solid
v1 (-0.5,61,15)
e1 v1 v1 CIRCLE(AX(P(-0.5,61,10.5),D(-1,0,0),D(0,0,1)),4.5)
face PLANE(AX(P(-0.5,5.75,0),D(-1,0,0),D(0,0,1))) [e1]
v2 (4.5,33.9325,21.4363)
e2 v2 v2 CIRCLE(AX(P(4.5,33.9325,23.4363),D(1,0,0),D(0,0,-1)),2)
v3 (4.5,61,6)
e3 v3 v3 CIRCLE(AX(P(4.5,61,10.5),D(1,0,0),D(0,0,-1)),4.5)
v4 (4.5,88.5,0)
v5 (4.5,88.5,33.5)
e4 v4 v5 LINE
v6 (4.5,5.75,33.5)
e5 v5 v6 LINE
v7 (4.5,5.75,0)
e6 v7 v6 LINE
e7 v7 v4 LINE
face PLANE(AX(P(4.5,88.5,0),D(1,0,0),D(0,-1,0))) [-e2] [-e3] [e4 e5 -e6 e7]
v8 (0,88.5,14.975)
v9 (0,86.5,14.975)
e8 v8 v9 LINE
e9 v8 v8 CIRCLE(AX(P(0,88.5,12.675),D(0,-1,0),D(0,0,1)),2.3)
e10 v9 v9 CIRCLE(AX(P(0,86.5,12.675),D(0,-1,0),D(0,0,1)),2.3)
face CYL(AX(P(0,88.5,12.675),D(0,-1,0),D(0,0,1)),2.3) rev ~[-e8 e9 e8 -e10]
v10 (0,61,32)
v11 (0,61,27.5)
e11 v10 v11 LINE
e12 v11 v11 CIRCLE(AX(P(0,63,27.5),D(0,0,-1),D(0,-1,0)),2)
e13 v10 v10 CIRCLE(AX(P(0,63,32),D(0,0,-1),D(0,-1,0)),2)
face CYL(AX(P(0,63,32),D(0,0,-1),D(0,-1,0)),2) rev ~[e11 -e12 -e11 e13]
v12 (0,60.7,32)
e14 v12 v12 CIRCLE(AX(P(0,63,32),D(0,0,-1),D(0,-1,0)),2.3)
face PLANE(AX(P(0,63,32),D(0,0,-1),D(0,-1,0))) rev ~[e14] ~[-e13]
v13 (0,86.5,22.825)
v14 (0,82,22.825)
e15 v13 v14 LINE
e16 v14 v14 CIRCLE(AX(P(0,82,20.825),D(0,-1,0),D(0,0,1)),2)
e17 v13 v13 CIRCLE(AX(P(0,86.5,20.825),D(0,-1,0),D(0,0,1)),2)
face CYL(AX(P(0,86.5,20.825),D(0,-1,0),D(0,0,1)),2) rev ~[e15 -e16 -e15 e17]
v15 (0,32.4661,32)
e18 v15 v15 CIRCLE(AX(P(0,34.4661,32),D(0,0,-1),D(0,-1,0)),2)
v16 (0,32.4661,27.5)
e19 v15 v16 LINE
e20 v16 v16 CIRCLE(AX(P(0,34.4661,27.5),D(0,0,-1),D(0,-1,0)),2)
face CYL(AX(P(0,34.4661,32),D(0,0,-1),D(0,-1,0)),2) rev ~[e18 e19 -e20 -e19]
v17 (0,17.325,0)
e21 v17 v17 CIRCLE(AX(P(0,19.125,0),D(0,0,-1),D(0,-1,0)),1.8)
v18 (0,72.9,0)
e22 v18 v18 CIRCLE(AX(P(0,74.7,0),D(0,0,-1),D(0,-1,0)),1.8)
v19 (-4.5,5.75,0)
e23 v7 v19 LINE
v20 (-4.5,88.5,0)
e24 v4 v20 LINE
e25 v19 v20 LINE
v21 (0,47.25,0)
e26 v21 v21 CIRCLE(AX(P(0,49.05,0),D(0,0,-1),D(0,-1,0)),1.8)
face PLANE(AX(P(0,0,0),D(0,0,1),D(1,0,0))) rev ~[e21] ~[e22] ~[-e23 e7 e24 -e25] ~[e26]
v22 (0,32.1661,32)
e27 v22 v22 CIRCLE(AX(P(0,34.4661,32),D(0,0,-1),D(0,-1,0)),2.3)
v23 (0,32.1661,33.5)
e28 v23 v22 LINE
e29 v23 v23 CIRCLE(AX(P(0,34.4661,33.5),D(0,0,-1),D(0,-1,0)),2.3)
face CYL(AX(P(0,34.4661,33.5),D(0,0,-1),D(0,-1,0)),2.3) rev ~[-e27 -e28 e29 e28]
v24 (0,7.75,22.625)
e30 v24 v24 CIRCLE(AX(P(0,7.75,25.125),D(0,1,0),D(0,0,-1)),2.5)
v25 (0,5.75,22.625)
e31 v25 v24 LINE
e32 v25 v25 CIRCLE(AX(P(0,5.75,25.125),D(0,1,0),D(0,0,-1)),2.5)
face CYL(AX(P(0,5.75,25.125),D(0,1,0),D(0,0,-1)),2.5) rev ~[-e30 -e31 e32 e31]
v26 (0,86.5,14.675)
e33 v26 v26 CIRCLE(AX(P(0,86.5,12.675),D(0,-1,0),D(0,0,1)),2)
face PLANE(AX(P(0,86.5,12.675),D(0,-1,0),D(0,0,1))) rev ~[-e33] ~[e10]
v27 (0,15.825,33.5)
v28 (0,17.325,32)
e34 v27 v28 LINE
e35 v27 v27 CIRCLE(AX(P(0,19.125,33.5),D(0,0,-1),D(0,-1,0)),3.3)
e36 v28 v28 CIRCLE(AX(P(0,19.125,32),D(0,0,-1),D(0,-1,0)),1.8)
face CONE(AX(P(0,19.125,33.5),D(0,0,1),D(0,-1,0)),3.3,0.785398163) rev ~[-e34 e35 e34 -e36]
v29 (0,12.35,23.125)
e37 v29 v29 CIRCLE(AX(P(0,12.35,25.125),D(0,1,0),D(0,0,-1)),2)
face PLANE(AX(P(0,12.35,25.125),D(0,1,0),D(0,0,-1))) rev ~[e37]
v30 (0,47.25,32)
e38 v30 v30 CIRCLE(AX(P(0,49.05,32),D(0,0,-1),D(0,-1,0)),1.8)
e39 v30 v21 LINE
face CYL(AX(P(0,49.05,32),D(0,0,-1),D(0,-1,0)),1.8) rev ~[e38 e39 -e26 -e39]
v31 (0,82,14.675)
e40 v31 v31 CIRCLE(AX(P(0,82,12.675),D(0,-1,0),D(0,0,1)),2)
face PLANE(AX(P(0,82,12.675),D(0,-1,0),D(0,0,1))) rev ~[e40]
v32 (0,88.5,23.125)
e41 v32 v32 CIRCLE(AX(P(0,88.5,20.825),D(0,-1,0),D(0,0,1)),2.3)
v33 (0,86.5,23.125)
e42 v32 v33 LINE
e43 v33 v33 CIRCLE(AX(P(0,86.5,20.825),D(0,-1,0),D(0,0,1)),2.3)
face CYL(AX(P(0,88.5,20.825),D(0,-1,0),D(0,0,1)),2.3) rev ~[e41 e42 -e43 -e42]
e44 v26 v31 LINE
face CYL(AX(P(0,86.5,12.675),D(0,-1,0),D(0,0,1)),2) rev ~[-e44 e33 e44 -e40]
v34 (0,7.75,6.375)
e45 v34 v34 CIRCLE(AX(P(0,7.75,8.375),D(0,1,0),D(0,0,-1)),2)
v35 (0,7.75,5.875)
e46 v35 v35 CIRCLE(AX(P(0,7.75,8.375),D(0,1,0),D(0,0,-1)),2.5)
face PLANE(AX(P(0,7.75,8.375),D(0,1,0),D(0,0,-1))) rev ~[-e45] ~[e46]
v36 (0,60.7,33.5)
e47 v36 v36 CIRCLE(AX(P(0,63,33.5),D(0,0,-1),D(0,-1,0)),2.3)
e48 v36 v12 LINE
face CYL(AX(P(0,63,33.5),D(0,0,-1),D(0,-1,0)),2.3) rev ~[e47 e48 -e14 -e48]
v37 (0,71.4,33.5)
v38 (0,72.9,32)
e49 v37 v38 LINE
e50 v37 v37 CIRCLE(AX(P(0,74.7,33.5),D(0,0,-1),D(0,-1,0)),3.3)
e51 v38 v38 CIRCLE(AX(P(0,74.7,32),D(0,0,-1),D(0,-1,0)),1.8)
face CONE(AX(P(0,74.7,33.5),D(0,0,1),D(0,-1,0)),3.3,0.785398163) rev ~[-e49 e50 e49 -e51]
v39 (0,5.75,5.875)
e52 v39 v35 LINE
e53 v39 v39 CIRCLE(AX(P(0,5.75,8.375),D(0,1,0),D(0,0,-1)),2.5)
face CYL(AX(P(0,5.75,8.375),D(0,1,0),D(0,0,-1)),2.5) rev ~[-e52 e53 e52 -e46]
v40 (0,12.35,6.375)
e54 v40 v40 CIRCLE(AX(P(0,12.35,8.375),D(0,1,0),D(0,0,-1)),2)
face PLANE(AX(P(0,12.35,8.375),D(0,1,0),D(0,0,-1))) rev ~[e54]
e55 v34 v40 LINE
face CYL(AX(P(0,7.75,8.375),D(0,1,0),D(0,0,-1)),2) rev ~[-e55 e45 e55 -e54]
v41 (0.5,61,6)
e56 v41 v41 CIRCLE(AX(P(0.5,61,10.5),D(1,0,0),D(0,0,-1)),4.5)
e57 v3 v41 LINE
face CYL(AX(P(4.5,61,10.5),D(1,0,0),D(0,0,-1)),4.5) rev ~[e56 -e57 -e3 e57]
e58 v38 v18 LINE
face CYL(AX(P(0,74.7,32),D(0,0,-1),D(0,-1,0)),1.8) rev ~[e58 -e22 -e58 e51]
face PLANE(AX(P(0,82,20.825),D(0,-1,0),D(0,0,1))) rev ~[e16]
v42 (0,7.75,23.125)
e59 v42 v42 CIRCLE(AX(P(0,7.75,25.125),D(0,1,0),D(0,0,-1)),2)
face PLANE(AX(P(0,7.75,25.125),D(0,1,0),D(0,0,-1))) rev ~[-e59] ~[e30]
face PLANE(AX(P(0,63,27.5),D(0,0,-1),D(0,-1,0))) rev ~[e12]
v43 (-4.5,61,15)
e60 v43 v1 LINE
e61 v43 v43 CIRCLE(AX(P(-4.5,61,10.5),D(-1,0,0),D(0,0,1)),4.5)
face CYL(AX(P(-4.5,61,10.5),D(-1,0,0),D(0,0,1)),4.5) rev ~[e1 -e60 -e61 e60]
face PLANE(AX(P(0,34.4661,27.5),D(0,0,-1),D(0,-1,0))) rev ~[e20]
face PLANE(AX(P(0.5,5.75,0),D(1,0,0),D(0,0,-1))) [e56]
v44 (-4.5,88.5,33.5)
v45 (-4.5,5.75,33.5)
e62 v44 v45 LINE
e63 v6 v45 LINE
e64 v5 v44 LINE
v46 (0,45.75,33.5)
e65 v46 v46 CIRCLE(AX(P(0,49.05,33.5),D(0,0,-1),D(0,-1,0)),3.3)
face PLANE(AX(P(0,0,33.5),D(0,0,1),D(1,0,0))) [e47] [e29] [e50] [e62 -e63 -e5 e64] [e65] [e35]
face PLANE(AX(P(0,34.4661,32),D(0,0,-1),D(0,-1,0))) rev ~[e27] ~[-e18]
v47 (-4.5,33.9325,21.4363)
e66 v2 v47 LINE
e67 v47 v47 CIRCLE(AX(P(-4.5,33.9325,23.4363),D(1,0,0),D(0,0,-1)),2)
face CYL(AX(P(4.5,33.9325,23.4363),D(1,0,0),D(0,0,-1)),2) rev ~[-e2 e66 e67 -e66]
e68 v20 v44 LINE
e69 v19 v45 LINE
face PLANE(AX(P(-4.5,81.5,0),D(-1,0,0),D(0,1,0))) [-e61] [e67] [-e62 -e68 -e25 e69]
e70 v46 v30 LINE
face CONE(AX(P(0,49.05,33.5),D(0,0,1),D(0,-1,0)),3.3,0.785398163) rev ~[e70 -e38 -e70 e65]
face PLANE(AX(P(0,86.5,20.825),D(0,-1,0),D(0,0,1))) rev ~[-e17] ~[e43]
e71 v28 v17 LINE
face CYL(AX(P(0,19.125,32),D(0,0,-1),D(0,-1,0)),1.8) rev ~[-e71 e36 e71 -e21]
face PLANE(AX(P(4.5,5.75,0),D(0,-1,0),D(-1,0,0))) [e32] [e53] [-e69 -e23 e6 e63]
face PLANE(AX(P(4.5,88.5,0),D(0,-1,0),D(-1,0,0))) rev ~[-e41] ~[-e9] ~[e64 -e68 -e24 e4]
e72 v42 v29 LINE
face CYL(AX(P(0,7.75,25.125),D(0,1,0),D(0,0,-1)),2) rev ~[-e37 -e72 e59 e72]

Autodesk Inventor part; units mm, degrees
ref_plane "YZ Plane" through (0, 0, 0) normal (1, 0, 0) x (0, 1, 0)
ref_plane "XZ Plane" through (0, 0, 0) normal (0, 1, 0) x (-1, 0, 0)
ref_plane "Work Plane1" through (0, 0, 0) normal (0, 0, 1) x (1, 0, 0)
ref_plane "Work Plane2" through (-89, -40.3889, 33.5) normal (0, 0, 1) x (1, 0, 0)
sketch "Sketch1" plane through (0, 0, 0) normal (0, 0, 1) x (1, 0, 0)
  line L0 (23.5, 88.5) -> (-23.5, 88.5) projected
  line L1 (-23.5, 88.5) -> (-23.5, 36.5) projected
  line L2 (-26.5, 33.5) -> (-89, 33.5) projected
  line L3 (-89, 33.5) -> (-89, -72.5) projected
  line L4 (-89, -72.5) -> (-77, -72.5) projected
  line L5 (-74, -75.5) -> (-74, -93.5) projected
  line L6 (-74, -93.5) -> (74, -93.5) projected
  line L7 (74, -93.5) -> (74, -75.5) projected
  line L8 (77, -72.5) -> (89, -72.5) projected
  line L9 (89, -72.5) -> (89, 33.5) projected
  line L10 (89, 33.5) -> (26.5, 33.5) projected
  line L11 (23.5, 36.5) -> (23.5, 88.5) projected
  line L12 (-4.5, 81.5) -> (-4.5, 36.5) projected
  line L13 (-7.5, 33.5) -> (-13.5, 33.5) projected
  line L14 (-16.5, 36.5) -> (-16.5, 81.5) projected
  line L15 (7.5, 84.5) -> (13.5, 84.5) projected
  line L16 (16.5, 81.5) -> (16.5, 36.5) projected
  line L17 (13.5, 33.5) -> (7.5, 33.5) projected
  line L18 (4.5, 36.5) -> (4.5, 81.5) projected
  line L19 (-13.5, 84.5) -> (-7.5, 84.5) projected
  line L20 (-4.5, 88.5) -> (4.5, 88.5)
  line L21 (4.5, 88.5) -> (4.5, 5.75)
  line L22 (4.5, 5.75) -> (-4.5, 5.75)
  line L23 (-4.5, 5.75) -> (-4.5, 88.5)
  line L24 (-32.2, 4.75) -> (-59.9, 4.75)
  arc A0 (13.5, 33.5) -> (16.5, 36.5) centre (13.5, 36.5) ccw projected
  arc A1 (4.5, 36.5) -> (7.5, 33.5) centre (7.5, 36.5) ccw projected
  arc A2 (7.5, 84.5) -> (4.5, 81.5) centre (7.5, 81.5) ccw projected
  arc A3 (16.5, 81.5) -> (13.5, 84.5) centre (13.5, 81.5) ccw projected
  arc A4 (-4.5, 81.5) -> (-7.5, 84.5) centre (-7.5, 81.5) ccw projected
  arc A5 (-7.5, 33.5) -> (-4.5, 36.5) centre (-7.5, 36.5) ccw projected
  arc A6 (-16.5, 36.5) -> (-13.5, 33.5) centre (-13.5, 36.5) ccw projected
  arc A7 (-13.5, 84.5) -> (-16.5, 81.5) centre (-13.5, 81.5) ccw projected
  arc A8 (-26.5, 33.5) -> (-23.5, 36.5) centre (-26.5, 36.5) ccw projected
  arc A9 (-74, -75.5) -> (-77, -72.5) centre (-77, -75.5) ccw projected
  arc A10 (77, -72.5) -> (74, -75.5) centre (77, -75.5) ccw projected
  arc A11 (23.5, 36.5) -> (26.5, 33.5) centre (26.5, 36.5) ccw projected
  circle A12 centre (21.5, -85.5) radius 1.8 projected
  circle A13 centre (-64.5, -85.5) radius 1.8 projected
  circle A14 centre (83.4, -16.3889) radius 1.8 projected
  circle A15 centre (-83.4, -19.2889) radius 1.8 projected
  circle A16 centre (-21.5, -85.5) radius 1.8 projected
  circle A17 centre (64.5, -85.5) radius 1.8 projected
  circle A18 centre (39.125, 4.3375) radius 1.0065 projected
  circle A19 centre (-72.95, 4.275) radius 1.0065 projected
  circle A20 centre (39.125, 25.9125) radius 1.0065 projected
  circle A21 centre (72.95, 12.275) radius 1.0065 projected
  circle A22 centre (86, 30.5) radius 1.0065 projected
  circle A23 centre (-86, 30.5) radius 1.0065 projected
  circle A24 centre (-39.125, 12.3375) radius 1.0065 projected
  circle A25 centre (-72.95, 25.975) radius 1.0065 projected
  circle A26 centre (-72.95, 12.275) radius 1.0065 projected
  circle A27 centre (-39.125, 25.9125) radius 1.0065 projected
  circle A28 centre (-86, 7.75) radius 1.0065 projected
  circle A29 centre (86, 7.75) radius 1.0065 projected
  circle A30 centre (72.95, 25.975) radius 1.0065 projected
  circle A31 centre (39.125, 12.3375) radius 1.0065 projected
  circle A32 centre (-39.125, 4.3375) radius 1.0065 projected
  circle A33 centre (72.95, 4.275) radius 1.0065 projected
  circle A34 centre (78, -67.1725) radius 1.2295 projected
  circle A35 centre (-24.1, -73.1) radius 1.2295 projected
  circle A36 centre (24.1, -24.9) radius 1.2295 projected
  circle A37 centre (-42.4984, -44.6666) radius 1.2295 projected
  circle A38 centre (-79, -42.3889) radius 1.2295 projected
  circle A39 centre (-19.5, 28.875) radius 1.2295 projected
  circle A40 centre (19.5, 9.55) radius 1.2295 projected
  circle A41 centre (19.5, 47.3) radius 1.2295 projected
  circle A42 centre (-19.5, 47.3) radius 1.2295 projected
  circle A43 centre (0, 74.7) radius 1.2295 projected
  circle A44 centre (-19.4231, 74.8077) radius 1.2295 projected
  circle A45 centre (19.5, 74.7) radius 1.2295 projected
  circle A46 centre (0, 49.05) radius 1.2295 projected
  circle A47 centre (19.5, 28.875) radius 1.2295 projected
  circle A48 centre (0, 19.125) radius 1.2295 projected
  circle A49 centre (-19.5, 9.55) radius 1.2295 projected
  circle A50 centre (-78, -67.1725) radius 1.2295 projected
  circle A51 centre (-24.1, -24.9) radius 1.2295 projected
  circle A52 centre (24.1, -73.1) radius 1.2295 projected
  circle A53 centre (42.5, -44.6649) radius 1.2295 projected
  circle A54 centre (79, -42.3889) radius 1.2295 projected
  line L25 (74, -12.9454) -> (74, -38.6649) projected
  line L26 (32.5736, -41.3399) -> (10.2484, -66.6122) projected
  line L27 (40.7223, -24.1882) -> (40.7223, -2.7315) projected
  line L28 (15.0791, 0.2685) -> (31.7223, 0.2685) projected
  line L29 (-68.7516, -10.9592) -> (-46.0313, -36.6788) projected
  line L30 (-74, -38.6649) -> (-74, -12.9454) projected
  line L31 (43.7223, 0.2685) -> (62.6769, 0.2685) projected
  line L32 (-40.7223, -2.7315) -> (-40.7223, -24.1882) projected
  line L33 (-45.9707, -26.1743) -> (-64.9252, -4.7177) projected
  line L34 (46.0313, -36.6788) -> (68.7516, -10.9592) projected
  line L35 (-62.6769, 0.2685) -> (-43.7223, 0.2685) projected
  line L36 (34.7223, -2.7315) -> (34.7223, -24.9078) projected
  line L37 (29.5555, -26.9826) -> (10.5667, -7.1519) projected
  line L38 (-31.598, -53.0174) -> (-25.9833, -59.3733) projected
  line L39 (-10.5667, -7.1519) -> (-29.5555, -26.9826) projected
  line L40 (-34.7223, -24.9078) -> (-34.7223, -2.7315) projected
  line L41 (-31.7223, 0.2685) -> (-15.0791, 0.2685) projected
  line L42 (25.9833, -59.3733) -> (31.598, -53.0174) projected
  line L43 (64.9252, -4.7177) -> (45.9707, -26.1743) projected
  line L44 (-10.2484, -66.6122) -> (-32.5736, -41.3399) projected
  line L45 (-32.4921, -37.2789) -> (-10.1668, -13.9638) projected
  line L46 (10.1668, -13.9638) -> (32.4921, -37.2789) projected
  line L47 (29.5955, -81.1563) -> (25.3044, -62.0157) projected
  arc A55 (25.9833, -59.3733) -> (25.3044, -62.0157) centre (28.2317, -61.3594) ccw projected
  line L48 (43.9754, -47.6649) -> (68.9203, -47.6649) projected
  arc A56 (71.5475, -52.1134) -> (68.9203, -47.6649) centre (68.9203, -50.6649) ccw projected
  line L49 (71.5475, -52.1134) -> (58.4661, -75.8408) projected
  line L50 (46.5943, -83.5) -> (32.5229, -83.5) projected
  arc A57 (29.5955, -81.1563) -> (32.5229, -83.5) centre (32.5229, -80.5) ccw projected
  line L51 (-5, -16.0387) -> (-5, -64.6261) projected
  arc A58 (-10.2484, -66.6122) -> (-5, -64.6261) centre (-8, -64.6261) ccw projected
  arc A59 (-32.4921, -37.2789) -> (-32.5736, -41.3399) centre (-30.3253, -39.3537) ccw projected
  arc A60 (-5, -16.0387) -> (-10.1668, -13.9638) centre (-8, -16.0387) ccw projected
  arc A61 (-40.7223, -2.7315) -> (-43.7223, 0.2685) centre (-43.7223, -2.7315) ccw projected
  arc A62 (-45.9707, -26.1743) -> (-40.7223, -24.1882) centre (-43.7223, -24.1882) ccw projected
  arc A63 (-62.6769, 0.2685) -> (-64.9252, -4.7177) centre (-62.6769, -2.7315) ccw projected
  arc A64 (-25.3044, -62.0157) -> (-25.9833, -59.3733) centre (-28.2317, -61.3594) ccw projected
  line L52 (-25.3044, -62.0157) -> (-29.5955, -81.1563) projected
  arc A65 (-32.5229, -83.5) -> (-29.5955, -81.1563) centre (-32.5229, -80.5) ccw projected
  line L53 (-32.5229, -83.5) -> (-46.5943, -83.5) projected
  line L54 (-58.4661, -75.8408) -> (-71.5475, -52.1134) projected
  arc A66 (-68.9203, -47.6649) -> (-71.5475, -52.1134) centre (-68.9203, -50.6649) ccw projected
  line L55 (-68.9203, -47.6649) -> (-43.9754, -47.6649) projected
  line L56 (-49.775, 11.125) -> (-62.3, 11.125) projected
  arc A67 (-62.3, 27.125) -> (-62.3, 11.125) centre (-62.3, 19.125) ccw projected
  line L57 (-62.3, 27.125) -> (-49.775, 27.125) projected
  arc A68 (-49.775, 11.125) -> (-49.775, 27.125) centre (-49.775, 19.125) ccw projected
  arc A69 (-31.7223, 0.2685) -> (-34.7223, -2.7315) centre (-31.7223, -2.7315) ccw projected
  arc A70 (-12.9578, -0.6102) -> (-15.0791, 0.2685) centre (-15.0791, -2.7315) ccw projected
  line L58 (-12.9578, -0.6102) -> (-10.6122, -2.9558) projected
  arc A71 (-10.5667, -7.1519) -> (-10.6122, -2.9558) centre (-12.7335, -5.0771) ccw projected
  arc A72 (-34.7223, -24.9078) -> (-29.5555, -26.9826) centre (-31.7223, -24.9078) ccw projected
  arc A73 (71, -41.6649) -> (74, -38.6649) centre (71, -38.6649) ccw projected
  line L59 (71, -41.6649) -> (48.2797, -41.6649) projected
  arc A74 (46.0313, -36.6788) -> (48.2797, -41.6649) centre (48.2797, -38.6649) ccw projected
  arc A75 (74, -12.9454) -> (68.7516, -10.9592) centre (71, -12.9454) ccw projected
  arc A76 (40.7223, -24.1882) -> (45.9707, -26.1743) centre (43.7223, -24.1882) ccw projected
  arc A77 (43.7223, 0.2685) -> (40.7223, -2.7315) centre (43.7223, -2.7315) ccw projected
  arc A78 (64.9252, -4.7177) -> (62.6769, 0.2685) centre (62.6769, -2.7315) ccw projected
  arc A79 (5, -64.6261) -> (10.2484, -66.6122) centre (8, -64.6261) ccw projected
  line L60 (5, -64.6261) -> (5, -16.0387) projected
  arc A80 (10.1668, -13.9638) -> (5, -16.0387) centre (8, -16.0387) ccw projected
  arc A81 (32.5736, -41.3399) -> (32.4921, -37.2789) centre (30.3253, -39.3537) ccw projected
  arc A82 (29.5555, -26.9826) -> (34.7223, -24.9078) centre (31.7223, -24.9078) ccw projected
  arc A83 (10.6122, -2.9558) -> (10.5667, -7.1519) centre (12.7335, -5.0771) ccw projected
  line L61 (10.6122, -2.9558) -> (12.9578, -0.6102) projected
  arc A84 (15.0791, 0.2685) -> (12.9578, -0.6102) centre (15.0791, -2.7315) ccw projected
  arc A85 (34.7223, -2.7315) -> (31.7223, 0.2685) centre (31.7223, -2.7315) ccw projected
  arc A86 (-48.2797, -41.6649) -> (-46.0313, -36.6788) centre (-48.2797, -38.6649) ccw projected
  line L62 (-48.2797, -41.6649) -> (-71, -41.6649) projected
  arc A87 (-74, -38.6649) -> (-71, -41.6649) centre (-71, -38.6649) ccw projected
  arc A88 (-68.7516, -10.9592) -> (-74, -12.9454) centre (-71, -12.9454) ccw projected
  line L63 (49.775, 27.125) -> (62.3, 27.125) projected
  arc A89 (62.3, 11.125) -> (62.3, 27.125) centre (62.3, 19.125) ccw projected
  line L64 (62.3, 11.125) -> (49.775, 11.125) projected
  arc A90 (49.775, 27.125) -> (49.775, 11.125) centre (49.775, 19.125) ccw projected
  arc A91 (53.1556, -75.734) -> (58.4661, -75.8408) centre (55.8389, -74.3924) ccw projected
  line L65 (53.1556, -75.734) -> (41.2921, -52.0066) projected
  arc A92 (43.9754, -47.6649) -> (41.2921, -52.0066) centre (43.9754, -50.6649) ccw projected
  arc A93 (36.5297, -53.662) -> (31.598, -53.0174) centre (33.8464, -55.0036) ccw projected
  line L66 (36.5297, -53.662) -> (49.2776, -79.1584) projected
  arc A94 (46.5943, -83.5) -> (49.2776, -79.1584) centre (46.5943, -80.5) ccw projected
  arc A95 (-49.2776, -79.1584) -> (-46.5943, -83.5) centre (-46.5943, -80.5) ccw projected
  line L67 (-49.2776, -79.1584) -> (-36.5297, -53.662) projected
  arc A96 (-31.598, -53.0174) -> (-36.5297, -53.662) centre (-33.8464, -55.0036) ccw projected
  arc A97 (-41.2921, -52.0066) -> (-43.9754, -47.6649) centre (-43.9754, -50.6649) ccw projected
  line L68 (-41.2921, -52.0066) -> (-53.1556, -75.734) projected
  arc A98 (-58.4661, -75.8408) -> (-53.1556, -75.734) centre (-55.8389, -74.3924) ccw projected
  point P0 (0, 0)
  point P1 (-4.5, 81.5)
  point P2 (-4.5, 36.5)
  point P3 (7.5, 81.5)
  point P4 (13.5, 81.5)
  point P5 (-7.5, 81.5)
  point P6 (-13.5, 81.5)
  point P7 (-29, -78.5)
  point P8 (-57, -78.5)
  point P9 (29, -78.5)
  point P10 (57, -78.5)
  dimension "d41" = 1
extrude "Extrusion1" add sketch "Sketch1" along normal up to surface (33.5 mm away) contours L21 L18 L22 L23 L12 L0 | A43 | A46 | A48
sketch "Sketch2" plane through (4.5, 5.75, 0) normal (1, 0, 0) x (0, 0, -1)
  circle A0 centre (-23.4363, 28.1825) radius 2 projected
  point P0 (0, -5.75)
extrude "Extrusion2" cut sketch "Sketch2" against normal blind 10
sketch "Sketch3" plane through (4.5, 5.75, 0) normal (1, 0, 0) x (0, 0, -1)
  circle A0 centre (-10.5, 55.25) radius 4.5 projected
  point P0 (0, -5.75)
extrude "Extrusion3" cut sketch "Sketch3" against normal blind 4
sketch "Sketch4" plane through (-4.5, 5.75, 0) normal (-1, 0, 0) x (0, 0, 1)
  circle A0 centre (10.5, 55.25) radius 4.5 projected
  point P0 (0, -5.75)
extrude "Extrusion4" cut sketch "Sketch4" against normal blind 4
sketch "Sketch5" plane through (-4.5, 5.75, 33.5) normal (0, 0, 1) x (1, 0, 0)
  line L0 (5, 59.75) -> (5, 50.75) projected
  line L1 (4, 50.75) -> (4, 59.75) projected
  line L2 (9, 26.1825) -> (0, 26.1825) projected
  line L3 (9, 30.1825) -> (0, 30.1825) projected
  line L4 (17, 78.15) -> (-8, 78.15)
  line L5 (-8, 35.85) -> (17, 35.85)
  line L6 (9, 82.75) -> (9, 0) projected
  line L7 (0, 50.75) -> (0, 59.75) projected
  line L8 (9, 35.85) -> (0, 35.85)
  line L9 (0, 35.85) -> (0, 50.75)
  line L10 (0, 50.75) -> (9, 50.75)
  line L11 (9, 50.75) -> (9, 35.85)
  line L12 (0, 0) -> (0, 82.75) projected
  line L13 (9, 78.15) -> (0, 78.15)
  line L14 (0, 78.15) -> (0, 59.75)
  line L15 (0, 59.75) -> (9, 59.75)
  line L16 (9, 59.75) -> (9, 78.15)
  line L17 (-18, 6.625) -> (-18, 20.125) projected
  line L18 (-18, 13.375) -> (27, 13.375)
  line L19 (9, 35.85) -> (0, 50.75)
  line L20 (9, 59.75) -> (9, 50.75) projected
  line L21 (0, 35.85) -> (9, 50.75)
  line L22 (9, 59.75) -> (0, 78.15)
  line L23 (0, 59.75) -> (9, 78.15)
  point P0 (4.5, -5.75)
  point P1 (4.5, 13.375)
  point P2 (4.5, 43.3)
  point P3 (4.5, 68.95)
  dimension "d9" = 4.5
  dimension "d10" = 4.5
hole "Hole1" at (0, 19.125, 33.5) at (0, 49.05, 33.5) at (0, 74.7, 33.5) direction (0, 0, -1) diameter 3.6 end through all countersink diameter 6.6 countersink angle 90 clearance for "Countersunk Flat Head Screw ISO 2009/7046" size "M3" standard "ISO"
sketch "Sketch6" plane through (-4.5, 5.75, 0) normal (0, -1, 0) x (1, 0, 0)
  line L0 (9, 33.5) -> (0, 33.5) projected
  line L1 (0, 0) -> (0, 33.5) projected
  line L2 (0, 0) -> (9, 0) projected
  line L3 (9, 0) -> (9, 33.5) projected
  line L4 (0, 16.75) -> (9, 16.75)
  line L5 (9, 16.75) -> (0, 33.5)
  line L6 (9, 33.5) -> (0, 16.75)
  line L7 (0, 16.75) -> (9, 0)
  line L8 (9, 16.75) -> (0, 0)
  point P0 (4.5, 0)
  point P1 (4.5, 8.375)
  point P2 (4.5, 25.125)
hole "Hole2" at (0, 5.75, 8.375) at (0, 5.75, 25.125) direction (0, 1, 0) diameter 4 depth 6.6 counterbore diameter 5 counterbore depth 2
sketch "Sketch7" plane through (-4.5, 88.5, 0) normal (0, 1, 0) x (1, 0, 0)
  line L0 (0, -33.5) -> (9, -33.5) projected
  line L1 (0, -33.5) -> (9, -33.5) projected
  line L2 (9, 0) -> (9, -33.5) projected
  line L3 (9, 0) -> (0, 0) projected
  line L4 (0, 0) -> (0, -33.5) projected
  line L5 (-8, -1.4) -> (-8, -6.6) projected
  line L6 (-8, -32.1) -> (-8, -26.9) projected
  line L7 (17, -32.1) -> (17, -26.9) projected
  line L8 (17, -1.4) -> (17, -6.6) projected
  line L9 (17, -32.1) -> (-8, -32.1)
  line L10 (-8, -32.1) -> (-8, -26.9)
  line L11 (-8, -26.9) -> (17, -26.9)
  line L12 (17, -26.9) -> (17, -32.1)
  line L13 (-8, -6.6) -> (17, -6.6)
  line L14 (17, -6.6) -> (17, -1.4)
  line L15 (17, -1.4) -> (-8, -1.4)
  line L16 (-8, -1.4) -> (-8, -6.6)
  line L17 (17, -6.6) -> (-8, -6.6)
  line L18 (-8, -6.6) -> (-8, -8.6)
  line L19 (-8, -8.6) -> (17, -8.6)
  line L20 (17, -8.6) -> (17, -6.6)
  line L21 (-8, -26.9) -> (17, -26.9)
  line L22 (17, -26.9) -> (17, -24.9)
  line L23 (17, -24.9) -> (-8, -24.9)
  line L24 (-8, -24.9) -> (-8, -26.9)
  line L25 (9, 0) -> (9, -33.5) projected
  line L26 (9, -16.75) -> (0, -16.75)
  line L27 (0, 0) -> (0, -33.5) projected
  line L28 (9, -24.9) -> (0, -16.75)
  line L29 (9, -8.6) -> (0, -16.75)
  line L30 (0, -8.6) -> (9, -16.75)
  line L31 (9, -16.75) -> (0, -24.9)
  point P0 (4.5, 0)
  point P1 (4.5, -20.825)
  point P2 (4.5, -12.675)
  dimension "d25" = 2
  dimension "d26" = 2
hole "Hole3" at (0, 88.5, 20.825) at (0, 88.5, 12.675) direction (0, -1, 0) diameter 4 depth 6.5 counterbore diameter 4.6 counterbore depth 2
sketch "Sketch8" plane through (-4.5, 5.75, 33.5) normal (0, 0, 1) x (1, 0, 0)
  line L0 (26, 27.2497) -> (-17, 27.2497)
  line L1 (26, 31.2497) -> (-17, 31.2497)
  line L2 (4, 52.75) -> (-1, 52.75)
  line L3 (4, 61.75) -> (-1, 61.75)
  line L4 (10, 61.75) -> (5, 61.75)
  line L5 (9, 50.75) -> (5, 50.75) projected
  line L6 (0, 0) -> (0, 82.75) projected
  line L7 (9, 52.75) -> (0, 52.75)
  line L8 (0, 52.75) -> (0, 61.75)
  line L9 (0, 61.75) -> (9, 61.75)
  line L10 (9, 61.75) -> (9, 50.75)
  line L11 (9, 26.1825) -> (0, 26.1825) projected
  line L12 (0, 31.2497) -> (9, 31.2497)
  line L13 (9, 31.2497) -> (9, 26.1825)
  line L14 (9, 26.1825) -> (0, 26.1825)
  line L15 (0, 26.1825) -> (0, 31.2497)
  line L16 (9, 26.1825) -> (0, 31.2497)
  line L17 (0, 26.1825) -> (9, 31.2497)
  line L18 (10, 51.75) -> (0, 61.75)
  line L19 (0, 52.75) -> (9, 61.75)
  point P0 (4.5, -5.75)
  point P1 (4.5, 28.7161)
  point P2 (4.5, 57.25)
hole "Hole4" at (0, 34.4661, 33.5) at (0, 63, 33.5) direction (0, 0, -1) diameter 4 depth 6 counterbore diameter 4.6 counterbore depth 1.5
equation "\"d9\" = d10"
properties part number "middle_gear_holder" material "Nylon 6/6"
